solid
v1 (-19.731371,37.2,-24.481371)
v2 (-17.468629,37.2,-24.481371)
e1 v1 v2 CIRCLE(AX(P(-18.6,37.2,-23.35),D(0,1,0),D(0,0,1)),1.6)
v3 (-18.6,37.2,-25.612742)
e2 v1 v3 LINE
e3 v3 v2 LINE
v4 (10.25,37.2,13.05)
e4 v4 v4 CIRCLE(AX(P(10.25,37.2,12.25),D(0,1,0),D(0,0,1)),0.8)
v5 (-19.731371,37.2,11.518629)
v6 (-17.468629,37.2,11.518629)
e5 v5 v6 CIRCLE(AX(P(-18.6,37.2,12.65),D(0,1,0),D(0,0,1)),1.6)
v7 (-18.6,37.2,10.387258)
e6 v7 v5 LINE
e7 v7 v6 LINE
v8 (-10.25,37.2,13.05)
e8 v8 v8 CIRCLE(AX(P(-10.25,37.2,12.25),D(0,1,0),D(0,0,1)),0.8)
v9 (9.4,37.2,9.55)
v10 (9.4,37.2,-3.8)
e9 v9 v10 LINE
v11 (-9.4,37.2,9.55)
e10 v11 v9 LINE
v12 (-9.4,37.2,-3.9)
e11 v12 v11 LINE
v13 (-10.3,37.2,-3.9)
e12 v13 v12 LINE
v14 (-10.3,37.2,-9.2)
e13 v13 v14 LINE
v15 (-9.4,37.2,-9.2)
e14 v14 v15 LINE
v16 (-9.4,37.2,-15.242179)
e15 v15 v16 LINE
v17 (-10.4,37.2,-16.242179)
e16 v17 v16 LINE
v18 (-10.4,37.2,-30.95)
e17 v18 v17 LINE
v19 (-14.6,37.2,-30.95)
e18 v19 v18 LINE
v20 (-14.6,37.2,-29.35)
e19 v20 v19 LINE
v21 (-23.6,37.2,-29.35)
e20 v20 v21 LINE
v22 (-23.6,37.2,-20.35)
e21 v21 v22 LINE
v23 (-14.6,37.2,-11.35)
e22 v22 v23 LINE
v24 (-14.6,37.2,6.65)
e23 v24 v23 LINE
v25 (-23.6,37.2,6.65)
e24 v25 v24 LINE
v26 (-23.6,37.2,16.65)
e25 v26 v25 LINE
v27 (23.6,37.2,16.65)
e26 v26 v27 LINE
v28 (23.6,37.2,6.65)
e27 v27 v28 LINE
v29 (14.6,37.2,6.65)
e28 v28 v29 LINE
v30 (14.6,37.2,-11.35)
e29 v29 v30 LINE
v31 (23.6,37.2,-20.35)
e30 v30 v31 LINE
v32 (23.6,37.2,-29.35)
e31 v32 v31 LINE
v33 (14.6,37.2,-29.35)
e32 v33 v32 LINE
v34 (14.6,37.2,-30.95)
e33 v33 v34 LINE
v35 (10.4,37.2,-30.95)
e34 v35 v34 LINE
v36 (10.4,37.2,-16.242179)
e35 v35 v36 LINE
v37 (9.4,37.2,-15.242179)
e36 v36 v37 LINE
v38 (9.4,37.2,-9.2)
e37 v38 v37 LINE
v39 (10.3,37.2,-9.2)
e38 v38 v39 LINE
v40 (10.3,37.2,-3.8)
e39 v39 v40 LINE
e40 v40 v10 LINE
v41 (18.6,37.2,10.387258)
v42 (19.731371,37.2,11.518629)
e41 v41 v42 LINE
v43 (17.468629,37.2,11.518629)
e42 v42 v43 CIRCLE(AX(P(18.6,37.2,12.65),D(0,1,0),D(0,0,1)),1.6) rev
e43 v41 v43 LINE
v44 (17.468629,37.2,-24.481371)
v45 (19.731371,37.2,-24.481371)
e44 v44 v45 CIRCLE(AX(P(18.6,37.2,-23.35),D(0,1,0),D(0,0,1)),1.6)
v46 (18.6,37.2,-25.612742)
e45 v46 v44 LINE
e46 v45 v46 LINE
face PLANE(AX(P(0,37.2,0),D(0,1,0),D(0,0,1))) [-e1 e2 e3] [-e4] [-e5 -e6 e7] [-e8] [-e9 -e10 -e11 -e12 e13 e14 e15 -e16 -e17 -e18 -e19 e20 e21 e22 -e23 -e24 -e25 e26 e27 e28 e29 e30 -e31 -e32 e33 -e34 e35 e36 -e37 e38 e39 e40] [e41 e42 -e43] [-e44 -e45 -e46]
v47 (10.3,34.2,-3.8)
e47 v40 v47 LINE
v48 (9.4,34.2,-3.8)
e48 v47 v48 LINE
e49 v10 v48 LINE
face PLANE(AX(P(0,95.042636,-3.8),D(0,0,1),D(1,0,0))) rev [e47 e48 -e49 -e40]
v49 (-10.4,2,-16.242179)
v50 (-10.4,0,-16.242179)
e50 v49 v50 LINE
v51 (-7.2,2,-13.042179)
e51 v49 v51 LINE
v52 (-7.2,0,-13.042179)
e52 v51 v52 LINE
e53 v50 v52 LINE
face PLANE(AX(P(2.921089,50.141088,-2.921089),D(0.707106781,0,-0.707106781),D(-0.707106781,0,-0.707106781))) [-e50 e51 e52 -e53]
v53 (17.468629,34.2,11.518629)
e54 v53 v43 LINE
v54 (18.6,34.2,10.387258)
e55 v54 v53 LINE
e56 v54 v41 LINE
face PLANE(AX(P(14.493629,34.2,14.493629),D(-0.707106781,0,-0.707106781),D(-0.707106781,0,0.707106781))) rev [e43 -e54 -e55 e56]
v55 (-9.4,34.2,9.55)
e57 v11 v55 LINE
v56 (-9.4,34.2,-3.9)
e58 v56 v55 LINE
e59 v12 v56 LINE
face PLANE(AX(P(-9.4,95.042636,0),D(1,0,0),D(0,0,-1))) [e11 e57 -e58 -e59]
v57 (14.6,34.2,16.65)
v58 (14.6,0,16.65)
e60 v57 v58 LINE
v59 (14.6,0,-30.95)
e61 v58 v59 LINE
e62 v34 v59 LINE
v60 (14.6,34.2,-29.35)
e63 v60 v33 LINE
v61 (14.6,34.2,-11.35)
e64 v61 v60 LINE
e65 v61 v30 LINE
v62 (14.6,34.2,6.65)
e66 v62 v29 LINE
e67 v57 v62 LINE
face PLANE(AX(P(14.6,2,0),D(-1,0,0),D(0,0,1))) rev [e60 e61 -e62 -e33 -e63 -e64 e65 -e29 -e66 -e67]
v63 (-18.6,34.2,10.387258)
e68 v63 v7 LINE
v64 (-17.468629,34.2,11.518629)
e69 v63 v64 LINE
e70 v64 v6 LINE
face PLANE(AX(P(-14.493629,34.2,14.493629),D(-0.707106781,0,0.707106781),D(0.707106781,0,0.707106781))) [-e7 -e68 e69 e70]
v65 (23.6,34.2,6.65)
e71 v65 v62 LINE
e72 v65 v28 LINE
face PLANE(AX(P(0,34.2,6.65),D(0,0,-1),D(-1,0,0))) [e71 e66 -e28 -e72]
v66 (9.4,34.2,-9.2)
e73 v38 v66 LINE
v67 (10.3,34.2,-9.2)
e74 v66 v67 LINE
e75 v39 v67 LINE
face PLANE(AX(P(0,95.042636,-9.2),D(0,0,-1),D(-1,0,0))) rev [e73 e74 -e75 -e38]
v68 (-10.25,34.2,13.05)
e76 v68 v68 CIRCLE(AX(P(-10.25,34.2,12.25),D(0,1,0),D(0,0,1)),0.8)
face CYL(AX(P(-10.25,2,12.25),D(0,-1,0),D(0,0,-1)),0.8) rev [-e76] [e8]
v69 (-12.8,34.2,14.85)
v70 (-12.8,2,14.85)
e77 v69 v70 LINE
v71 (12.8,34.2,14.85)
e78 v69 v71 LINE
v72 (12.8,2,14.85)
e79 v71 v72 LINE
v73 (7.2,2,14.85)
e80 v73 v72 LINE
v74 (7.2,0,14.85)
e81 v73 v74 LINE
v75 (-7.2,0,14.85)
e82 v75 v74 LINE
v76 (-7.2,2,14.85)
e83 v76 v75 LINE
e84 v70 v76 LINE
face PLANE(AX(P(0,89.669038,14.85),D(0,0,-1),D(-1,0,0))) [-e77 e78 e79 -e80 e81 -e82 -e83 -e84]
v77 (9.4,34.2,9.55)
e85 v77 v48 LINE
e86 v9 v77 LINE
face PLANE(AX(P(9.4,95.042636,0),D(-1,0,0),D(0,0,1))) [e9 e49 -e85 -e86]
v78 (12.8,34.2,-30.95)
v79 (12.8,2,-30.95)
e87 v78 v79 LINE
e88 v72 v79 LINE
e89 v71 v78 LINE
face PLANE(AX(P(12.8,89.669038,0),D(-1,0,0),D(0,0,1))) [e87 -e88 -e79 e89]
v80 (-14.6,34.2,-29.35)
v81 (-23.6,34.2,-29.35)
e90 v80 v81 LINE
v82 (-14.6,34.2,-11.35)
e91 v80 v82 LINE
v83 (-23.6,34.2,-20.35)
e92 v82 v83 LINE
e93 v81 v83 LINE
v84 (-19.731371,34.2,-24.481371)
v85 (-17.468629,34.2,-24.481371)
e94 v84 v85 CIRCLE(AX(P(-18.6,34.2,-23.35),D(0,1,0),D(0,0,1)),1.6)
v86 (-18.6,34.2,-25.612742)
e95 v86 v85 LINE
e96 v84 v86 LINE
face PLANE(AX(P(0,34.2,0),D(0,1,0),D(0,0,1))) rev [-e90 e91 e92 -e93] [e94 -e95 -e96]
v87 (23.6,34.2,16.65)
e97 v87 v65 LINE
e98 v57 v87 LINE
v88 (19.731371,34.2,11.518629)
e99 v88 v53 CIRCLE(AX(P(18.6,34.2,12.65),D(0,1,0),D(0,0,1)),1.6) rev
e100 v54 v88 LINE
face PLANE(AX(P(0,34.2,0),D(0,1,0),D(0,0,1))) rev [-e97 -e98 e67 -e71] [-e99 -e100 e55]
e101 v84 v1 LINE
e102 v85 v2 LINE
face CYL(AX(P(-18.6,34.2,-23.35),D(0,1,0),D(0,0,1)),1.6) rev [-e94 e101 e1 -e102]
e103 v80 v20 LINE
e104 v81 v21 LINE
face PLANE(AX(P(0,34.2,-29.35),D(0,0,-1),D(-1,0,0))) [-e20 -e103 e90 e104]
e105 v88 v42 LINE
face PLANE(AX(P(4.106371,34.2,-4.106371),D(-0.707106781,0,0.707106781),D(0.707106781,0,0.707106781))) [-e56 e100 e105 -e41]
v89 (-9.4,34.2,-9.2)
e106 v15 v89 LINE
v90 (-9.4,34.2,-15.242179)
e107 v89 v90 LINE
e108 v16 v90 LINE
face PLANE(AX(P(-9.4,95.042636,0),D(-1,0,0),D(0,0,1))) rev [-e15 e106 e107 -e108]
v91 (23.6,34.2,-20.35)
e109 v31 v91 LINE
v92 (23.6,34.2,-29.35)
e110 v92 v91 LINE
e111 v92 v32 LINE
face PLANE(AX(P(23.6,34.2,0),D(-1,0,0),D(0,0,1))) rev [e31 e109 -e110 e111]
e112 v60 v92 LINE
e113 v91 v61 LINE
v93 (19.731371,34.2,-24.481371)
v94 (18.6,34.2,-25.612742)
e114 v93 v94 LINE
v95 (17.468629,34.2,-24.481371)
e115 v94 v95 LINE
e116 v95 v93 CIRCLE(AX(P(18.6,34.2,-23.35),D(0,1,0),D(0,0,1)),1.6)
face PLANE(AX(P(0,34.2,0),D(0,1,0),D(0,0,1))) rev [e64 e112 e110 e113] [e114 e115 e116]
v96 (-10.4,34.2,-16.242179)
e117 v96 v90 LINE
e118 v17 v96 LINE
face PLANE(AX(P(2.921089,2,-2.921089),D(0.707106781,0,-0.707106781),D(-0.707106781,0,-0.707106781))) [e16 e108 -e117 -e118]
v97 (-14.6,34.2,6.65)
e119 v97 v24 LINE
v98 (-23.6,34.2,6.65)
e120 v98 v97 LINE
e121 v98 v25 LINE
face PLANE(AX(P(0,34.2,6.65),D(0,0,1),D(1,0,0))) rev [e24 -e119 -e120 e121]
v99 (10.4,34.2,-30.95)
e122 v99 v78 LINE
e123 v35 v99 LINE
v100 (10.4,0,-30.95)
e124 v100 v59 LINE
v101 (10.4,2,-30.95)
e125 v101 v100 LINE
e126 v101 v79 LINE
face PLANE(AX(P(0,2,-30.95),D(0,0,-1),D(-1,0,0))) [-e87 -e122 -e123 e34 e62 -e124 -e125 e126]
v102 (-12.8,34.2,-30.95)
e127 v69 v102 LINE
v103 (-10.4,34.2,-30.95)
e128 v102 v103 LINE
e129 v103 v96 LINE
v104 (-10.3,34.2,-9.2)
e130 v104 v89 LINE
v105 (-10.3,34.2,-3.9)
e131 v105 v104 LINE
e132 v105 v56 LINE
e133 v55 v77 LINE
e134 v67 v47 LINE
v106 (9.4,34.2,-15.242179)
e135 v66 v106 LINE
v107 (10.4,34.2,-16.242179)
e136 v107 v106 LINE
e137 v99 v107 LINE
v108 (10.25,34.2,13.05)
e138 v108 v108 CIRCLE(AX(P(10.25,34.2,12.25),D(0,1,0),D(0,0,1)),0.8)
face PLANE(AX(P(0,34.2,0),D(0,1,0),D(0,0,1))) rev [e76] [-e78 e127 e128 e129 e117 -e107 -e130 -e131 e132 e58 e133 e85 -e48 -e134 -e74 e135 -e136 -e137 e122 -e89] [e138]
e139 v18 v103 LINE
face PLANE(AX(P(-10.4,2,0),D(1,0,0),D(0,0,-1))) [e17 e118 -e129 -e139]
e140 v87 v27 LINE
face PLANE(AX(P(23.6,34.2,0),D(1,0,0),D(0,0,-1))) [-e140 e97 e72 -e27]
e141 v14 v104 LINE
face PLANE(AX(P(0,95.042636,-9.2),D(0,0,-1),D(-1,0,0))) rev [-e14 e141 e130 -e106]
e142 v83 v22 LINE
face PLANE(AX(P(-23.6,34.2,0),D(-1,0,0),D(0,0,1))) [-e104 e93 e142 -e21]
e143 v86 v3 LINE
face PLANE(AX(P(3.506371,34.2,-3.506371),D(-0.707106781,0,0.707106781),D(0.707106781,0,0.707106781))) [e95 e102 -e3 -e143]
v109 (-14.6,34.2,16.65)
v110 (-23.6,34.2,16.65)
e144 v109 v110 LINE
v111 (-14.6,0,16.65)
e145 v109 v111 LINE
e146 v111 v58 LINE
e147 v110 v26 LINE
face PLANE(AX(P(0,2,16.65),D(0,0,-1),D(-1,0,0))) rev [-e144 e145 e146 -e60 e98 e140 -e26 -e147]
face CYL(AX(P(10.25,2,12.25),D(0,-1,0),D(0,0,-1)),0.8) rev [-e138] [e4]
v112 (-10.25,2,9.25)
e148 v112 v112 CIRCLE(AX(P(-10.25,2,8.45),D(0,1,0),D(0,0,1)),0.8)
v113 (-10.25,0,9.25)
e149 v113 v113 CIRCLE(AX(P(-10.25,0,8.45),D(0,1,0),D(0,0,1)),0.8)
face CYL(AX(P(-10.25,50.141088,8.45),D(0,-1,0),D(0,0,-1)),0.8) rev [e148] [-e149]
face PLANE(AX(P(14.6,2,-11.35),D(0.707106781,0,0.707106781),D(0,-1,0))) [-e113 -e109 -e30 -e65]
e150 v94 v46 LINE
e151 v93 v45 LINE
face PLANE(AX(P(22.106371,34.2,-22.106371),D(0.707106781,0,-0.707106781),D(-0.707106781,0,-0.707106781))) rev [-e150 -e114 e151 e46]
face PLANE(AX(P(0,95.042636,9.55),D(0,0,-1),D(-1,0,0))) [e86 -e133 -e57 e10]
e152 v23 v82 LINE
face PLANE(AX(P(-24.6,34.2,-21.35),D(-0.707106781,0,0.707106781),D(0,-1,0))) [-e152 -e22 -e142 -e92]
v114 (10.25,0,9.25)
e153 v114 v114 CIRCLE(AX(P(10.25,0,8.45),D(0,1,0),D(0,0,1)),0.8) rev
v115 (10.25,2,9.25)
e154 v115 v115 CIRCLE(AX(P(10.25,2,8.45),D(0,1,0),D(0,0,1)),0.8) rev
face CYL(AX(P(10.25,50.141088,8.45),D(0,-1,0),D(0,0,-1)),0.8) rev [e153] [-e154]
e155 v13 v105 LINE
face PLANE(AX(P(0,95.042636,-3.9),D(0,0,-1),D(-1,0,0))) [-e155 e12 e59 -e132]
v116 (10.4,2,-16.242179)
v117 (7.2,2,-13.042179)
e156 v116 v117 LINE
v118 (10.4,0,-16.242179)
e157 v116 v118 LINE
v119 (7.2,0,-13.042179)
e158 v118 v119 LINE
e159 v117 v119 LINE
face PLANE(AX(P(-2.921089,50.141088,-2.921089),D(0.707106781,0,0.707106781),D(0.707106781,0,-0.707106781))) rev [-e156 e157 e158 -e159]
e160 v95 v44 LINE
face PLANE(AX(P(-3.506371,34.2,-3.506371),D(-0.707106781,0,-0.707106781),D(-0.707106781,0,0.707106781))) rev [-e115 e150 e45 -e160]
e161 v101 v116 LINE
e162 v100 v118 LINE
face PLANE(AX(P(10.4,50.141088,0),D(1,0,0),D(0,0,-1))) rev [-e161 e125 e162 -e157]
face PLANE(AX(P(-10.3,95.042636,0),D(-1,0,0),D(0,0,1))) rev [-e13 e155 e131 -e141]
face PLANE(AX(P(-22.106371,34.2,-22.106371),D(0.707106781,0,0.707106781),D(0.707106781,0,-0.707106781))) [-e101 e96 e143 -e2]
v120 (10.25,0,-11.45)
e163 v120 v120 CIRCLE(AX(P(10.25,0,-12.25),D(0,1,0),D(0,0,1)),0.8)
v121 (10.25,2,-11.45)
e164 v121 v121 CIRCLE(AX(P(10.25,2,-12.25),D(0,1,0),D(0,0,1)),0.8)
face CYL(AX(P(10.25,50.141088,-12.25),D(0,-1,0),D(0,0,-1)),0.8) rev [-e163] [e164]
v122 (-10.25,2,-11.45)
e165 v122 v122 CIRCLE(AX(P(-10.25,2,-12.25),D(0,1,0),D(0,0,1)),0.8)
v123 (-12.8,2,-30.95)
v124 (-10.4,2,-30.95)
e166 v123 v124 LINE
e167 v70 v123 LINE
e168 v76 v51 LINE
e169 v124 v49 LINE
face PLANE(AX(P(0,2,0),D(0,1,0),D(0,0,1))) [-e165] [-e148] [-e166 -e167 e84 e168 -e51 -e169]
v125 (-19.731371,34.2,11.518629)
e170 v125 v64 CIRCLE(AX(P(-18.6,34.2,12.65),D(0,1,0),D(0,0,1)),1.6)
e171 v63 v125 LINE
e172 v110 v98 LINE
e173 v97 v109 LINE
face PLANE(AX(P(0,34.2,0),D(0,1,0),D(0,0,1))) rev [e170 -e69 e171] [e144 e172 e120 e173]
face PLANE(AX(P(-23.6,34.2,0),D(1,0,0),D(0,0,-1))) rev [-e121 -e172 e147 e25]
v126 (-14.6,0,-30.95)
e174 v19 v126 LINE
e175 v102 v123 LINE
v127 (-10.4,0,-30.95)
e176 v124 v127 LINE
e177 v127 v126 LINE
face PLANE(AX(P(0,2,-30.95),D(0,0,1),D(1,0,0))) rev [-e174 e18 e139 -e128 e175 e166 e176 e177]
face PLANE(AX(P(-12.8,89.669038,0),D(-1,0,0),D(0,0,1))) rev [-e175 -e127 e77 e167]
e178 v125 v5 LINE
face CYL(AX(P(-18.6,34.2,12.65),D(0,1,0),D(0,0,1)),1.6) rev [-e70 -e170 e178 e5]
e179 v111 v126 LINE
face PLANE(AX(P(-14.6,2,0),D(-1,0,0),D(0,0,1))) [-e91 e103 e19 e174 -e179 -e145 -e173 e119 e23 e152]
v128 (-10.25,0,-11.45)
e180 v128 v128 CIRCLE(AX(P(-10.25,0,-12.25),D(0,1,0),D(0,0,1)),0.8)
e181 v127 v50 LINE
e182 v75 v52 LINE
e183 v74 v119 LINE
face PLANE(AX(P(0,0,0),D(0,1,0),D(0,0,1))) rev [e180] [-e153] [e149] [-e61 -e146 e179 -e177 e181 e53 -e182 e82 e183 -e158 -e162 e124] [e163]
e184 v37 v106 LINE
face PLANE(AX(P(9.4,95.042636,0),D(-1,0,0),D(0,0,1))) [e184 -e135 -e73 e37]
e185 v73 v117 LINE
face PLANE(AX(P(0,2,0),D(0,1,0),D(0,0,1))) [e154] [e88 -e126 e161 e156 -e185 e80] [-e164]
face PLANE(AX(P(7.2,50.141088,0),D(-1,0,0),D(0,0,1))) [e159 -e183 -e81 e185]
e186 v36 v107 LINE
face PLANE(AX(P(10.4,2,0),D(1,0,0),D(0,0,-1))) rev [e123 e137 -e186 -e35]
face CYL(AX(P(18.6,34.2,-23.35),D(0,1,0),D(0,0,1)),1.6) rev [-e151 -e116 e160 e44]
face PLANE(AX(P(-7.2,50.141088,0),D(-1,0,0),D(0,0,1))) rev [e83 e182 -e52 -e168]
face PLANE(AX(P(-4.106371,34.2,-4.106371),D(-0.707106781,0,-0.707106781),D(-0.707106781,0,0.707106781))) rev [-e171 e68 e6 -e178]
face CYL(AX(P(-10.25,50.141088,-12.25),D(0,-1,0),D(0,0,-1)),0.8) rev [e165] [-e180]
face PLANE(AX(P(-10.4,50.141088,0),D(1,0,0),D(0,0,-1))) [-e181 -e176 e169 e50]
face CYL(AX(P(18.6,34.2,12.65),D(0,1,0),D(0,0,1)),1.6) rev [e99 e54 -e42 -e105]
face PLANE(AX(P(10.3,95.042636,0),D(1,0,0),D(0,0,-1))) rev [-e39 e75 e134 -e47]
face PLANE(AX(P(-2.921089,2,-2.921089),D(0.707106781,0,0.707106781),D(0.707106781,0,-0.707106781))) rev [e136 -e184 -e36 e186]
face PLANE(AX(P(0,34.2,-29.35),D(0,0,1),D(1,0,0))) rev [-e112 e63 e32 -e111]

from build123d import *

# Parameters (mm, degrees)
SKETCH1_R               = 0.8
BOSS_EXTRUDE2_DEPTH     = 2
BOSS_EXTRUDE4_DEPTH     = 35.2
BOSS_EXTRUDE7_OUTLINE_R = 0.8
BOSS_EXTRUDE7_DEPTH     = 37.2
SKETCH1_10_R            = 0.8
CUT_EXTRUDE6_DEPTH      = 34.2
SKETCH1_11_R            = 0.8
BOSS_EXTRUDE8_DEPTH     = 2
SKETCH2_W               = 9
SKETCH2_H               = 8
SKETCH2_H_2             = 10
BOSS_EXTRUDE9_DEPTH     = 3
CHAMFER1_SIZE           = 10


# Read off the part's stored shape, not the designer's step: Boss-Extrude7
with BuildPart() as part:
    # Sketch1 → Boss-Extrude2 (new body)
    with BuildSketch(Plane(origin=(0, 0, 0), x_dir=(1, 0, 0), z_dir=(0, 1, 0))):
        Polygon((-10.4, 16.242178951), (-10.4, 30.95), (-14.6, 30.95), (-14.6, -16.65), (14.6, -16.65), (14.6, 30.95), (10.4, 30.95), (10.4, 16.242178951), (7.2, 13.042178951), (7.2, -14.85), (-7.2, -14.85), (-7.2, 13.042178951), align=None)
        with Locations(Location((-10.25, -8.45, 0), (0, 0, 270))):
            Circle(SKETCH1_R, mode=Mode.SUBTRACT)
        with Locations(Location((-10.25, 12.25, 0), (0, 0, 270))):
            Circle(SKETCH1_R, mode=Mode.SUBTRACT)
        with Locations(Location((-10.25, -12.25, 0), (0, 0, 270))):
            Circle(SKETCH1_R, mode=Mode.SUBTRACT)
        with Locations(Location((10.25, -8.45, 0), (0, 0, 270))):
            Circle(SKETCH1_R, mode=Mode.SUBTRACT)
        with Locations(Location((10.25, -12.25, 0), (0, 0, 270))):
            Circle(SKETCH1_R, mode=Mode.SUBTRACT)
        with Locations(Location((10.25, 12.25, 0), (0, 0, 270))):
            Circle(SKETCH1_R, mode=Mode.SUBTRACT)
    extrude(amount=BOSS_EXTRUDE2_DEPTH)

    # Sketch1<6> → Boss-Extrude4 (add)
    with BuildSketch(Plane(origin=(0, 0, 0), x_dir=(1, 0, 0), z_dir=(0, 1, 0))):
        Polygon((-12.8, -14.85), (-12.8, 30.95), (-14.6, 30.95), (-14.6, -16.65), (14.6, -16.65), (14.6, 30.95), (12.8, 30.95), (12.8, -14.85), align=None)
    extrude(amount=BOSS_EXTRUDE4_DEPTH)

    # Boss-Extrude7 outline → Boss-Extrude7 (add)
    with BuildSketch(Plane(origin=(0, 0, 0), x_dir=(1, 0, 0), z_dir=(0, 1, 0))):
        Polygon((14.6, -16.65), (14.6, 30.95), (10.4, 30.95), (10.4, 16.242178951), (9.4, 15.242178951), (9.4, 9.2), (10.3, 9.2), (10.3, 3.8), (9.4, 3.8), (9.4, -9.55), (-9.4, -9.55), (-9.4, 3.9), (-10.3, 3.9), (-10.3, 9.2), (-9.4, 9.2), (-9.4, 15.242178951), (-10.4, 16.242178951), (-10.4, 30.95), (-14.6, 30.95), (-14.6, -16.65), align=None)
        with Locations((-10.25, -12.25)):
            Circle(BOSS_EXTRUDE7_OUTLINE_R, mode=Mode.SUBTRACT)
        with Locations((10.25, -12.25)):
            Circle(BOSS_EXTRUDE7_OUTLINE_R, mode=Mode.SUBTRACT)
    extrude(amount=BOSS_EXTRUDE7_DEPTH)

    # Sketch1<10> → Cut-Extrude6 (cut)
    with BuildSketch(Plane(origin=(0, 0, 0), x_dir=(1, 0, 0), z_dir=(0, 1, 0))):
        Polygon((-10.4, 16.242178951), (-10.4, 30.95), (-12.8, 30.95), (-12.8, -14.85), (12.8, -14.85), (12.8, 30.95), (10.4, 30.95), (10.4, 16.242178951), (7.2, 13.042178951), (7.2, -9.55), (-7.2, -9.55), (-7.2, 13.042178951), align=None)
        with Locations(Location((-10.25, -12.25, 0), (0, 0, 270))):
            Circle(SKETCH1_10_R, mode=Mode.SUBTRACT)
        with Locations(Location((10.25, -12.25, 0), (0, 0, 270))):
            Circle(SKETCH1_10_R, mode=Mode.SUBTRACT)
    extrude(amount=CUT_EXTRUDE6_DEPTH, mode=Mode.SUBTRACT)

    # Sketch1<11> → Boss-Extrude8 (add)
    # profile 1 of 2: a face of its own
    with BuildSketch(Plane(origin=(0, 0, 0), x_dir=(1, 0, 0), z_dir=(0, 1, 0))):
        Polygon((-10.4, 16.242178951), (-10.4, 30.95), (-12.8, 30.95), (-12.8, -14.85), (-7.2, -14.85), (-7.2, 13.042178951), align=None)
        with Locations(Location((-10.25, -8.45, 0), (0, 0, 270))):
            Circle(SKETCH1_11_R, mode=Mode.SUBTRACT)
        with Locations(Location((-10.25, 12.25, 0), (0, 0, 270))):
            Circle(SKETCH1_11_R, mode=Mode.SUBTRACT)
    # profile 2 of 2: a face of its own
    with BuildSketch(Plane(origin=(0, 0, 0), x_dir=(1, 0, 0), z_dir=(0, 1, 0))):
        Polygon((7.2, -14.85), (12.8, -14.85), (12.8, 30.95), (10.4, 30.95), (10.4, 16.242178951), (7.2, 13.042178951), align=None)
        with Locations(Location((10.25, -8.45, 0), (0, 0, 270))):
            Circle(SKETCH1_11_R, mode=Mode.SUBTRACT)
        with Locations(Location((10.25, 12.25, 0), (0, 0, 270))):
            Circle(SKETCH1_11_R, mode=Mode.SUBTRACT)
    extrude(amount=BOSS_EXTRUDE8_DEPTH)

    # Sketch2 → Boss-Extrude9 (add)
    # profile 1 of 4: a face of its own
    with BuildSketch(Plane(origin=(0, 37.2, 0), x_dir=(1, 0, 0), z_dir=(0, 1, 0))):
        with Locations((-19.1, 25.35)):
            Rectangle(SKETCH2_W, SKETCH2_H)
        with BuildLine():
            ThreePointArc((-17.46862915, 24.48137085), (-18.6, 21.75), (-19.73137085, 24.48137085))
            Line((-19.73137085, 24.48137085), (-18.6, 25.6127417))
            Line((-18.6, 25.6127417), (-17.46862915, 24.48137085))
        make_face(mode=Mode.SUBTRACT)
    # profile 2 of 4: a face of its own
    with BuildSketch(Plane(origin=(0, 37.2, 0), x_dir=(1, 0, 0), z_dir=(0, 1, 0))):
        with Locations((19.1, 25.35)):
            Rectangle(SKETCH2_W, SKETCH2_H)
        with BuildLine():
            Line((18.6, 25.6127417), (19.73137085, 24.48137085))
            ThreePointArc((19.73137085, 24.48137085), (18.6, 21.75), (17.46862915, 24.48137085))
            Line((17.46862915, 24.48137085), (18.6, 25.6127417))
        make_face(mode=Mode.SUBTRACT)
    # profile 3 of 4: a face of its own
    with BuildSketch(Plane(origin=(0, 37.2, 0), x_dir=(1, 0, 0), z_dir=(0, 1, 0))):
        with Locations((-19.1, -11.65)):
            Rectangle(SKETCH2_W, SKETCH2_H_2)
        with BuildLine():
            Line((-19.73137085, -11.51862915), (-18.6, -10.3872583))
            Line((-18.6, -10.3872583), (-17.46862915, -11.51862915))
            ThreePointArc((-17.46862915, -11.51862915), (-18.6, -14.25), (-19.73137085, -11.51862915))
        make_face(mode=Mode.SUBTRACT)
    # profile 4 of 4: a face of its own
    with BuildSketch(Plane(origin=(0, 37.2, 0), x_dir=(1, 0, 0), z_dir=(0, 1, 0))):
        with Locations((19.1, -11.65)):
            Rectangle(SKETCH2_W, SKETCH2_H_2)
        with BuildLine():
            Line((17.46862915, -11.51862915), (18.6, -10.3872583))
            Line((18.6, -10.3872583), (19.73137085, -11.51862915))
            ThreePointArc((19.73137085, -11.51862915), (18.6, -14.25), (17.46862915, -11.51862915))
        make_face(mode=Mode.SUBTRACT)
    extrude(amount=-BOSS_EXTRUDE9_DEPTH)

    # Chamfer1
    # the kernel refuses this chamfer: 10 mm, written as the material it adds along each edge
    with BuildSketch(Plane(origin=(14.6, 37.2, -21.35), x_dir=(0.9996219169112968, 0, -0.027495876610586667), z_dir=(0, -1, 0))) as chamfer1_piece_1_section:
        Polygon((CHAMFER1_SIZE * 0.999621916911, CHAMFER1_SIZE * 0.0274958766106), (-CHAMFER1_SIZE * 0.0274958766106, CHAMFER1_SIZE * 0.999621916911), (0, 0), align=None)
    chamfer1_piece_1 = extrude(amount=3, mode=Mode.PRIVATE)
    chamfer1_piece_1 = split(chamfer1_piece_1, bisect_by=Plane(origin=(23.6, 35.7, -17.990992529), z_dir=(-1, 0, 0)), keep=Keep.TOP, mode=Mode.PRIVATE)
    add(chamfer1_piece_1)
    with BuildSketch(Plane(origin=(-14.6, 37.2, -21.35), x_dir=(-0.9996219169112968, 0, -0.027495876610586324), z_dir=(0, -1, 0))) as chamfer1_piece_2_section:
        Polygon((CHAMFER1_SIZE * 0.999621916911, -CHAMFER1_SIZE * 0.0274958766106), (-CHAMFER1_SIZE * 0.0274958766106, -CHAMFER1_SIZE * 0.999621916911), (0, 0), align=None)
    chamfer1_piece_2 = extrude(amount=3, mode=Mode.PRIVATE)
    chamfer1_piece_2 = split(chamfer1_piece_2, bisect_by=Plane(origin=(-23.6, 35.7, -17.990992529), z_dir=(1, 0, 0)), keep=Keep.TOP, mode=Mode.PRIVATE)
    add(chamfer1_piece_2)


solid = part.part
